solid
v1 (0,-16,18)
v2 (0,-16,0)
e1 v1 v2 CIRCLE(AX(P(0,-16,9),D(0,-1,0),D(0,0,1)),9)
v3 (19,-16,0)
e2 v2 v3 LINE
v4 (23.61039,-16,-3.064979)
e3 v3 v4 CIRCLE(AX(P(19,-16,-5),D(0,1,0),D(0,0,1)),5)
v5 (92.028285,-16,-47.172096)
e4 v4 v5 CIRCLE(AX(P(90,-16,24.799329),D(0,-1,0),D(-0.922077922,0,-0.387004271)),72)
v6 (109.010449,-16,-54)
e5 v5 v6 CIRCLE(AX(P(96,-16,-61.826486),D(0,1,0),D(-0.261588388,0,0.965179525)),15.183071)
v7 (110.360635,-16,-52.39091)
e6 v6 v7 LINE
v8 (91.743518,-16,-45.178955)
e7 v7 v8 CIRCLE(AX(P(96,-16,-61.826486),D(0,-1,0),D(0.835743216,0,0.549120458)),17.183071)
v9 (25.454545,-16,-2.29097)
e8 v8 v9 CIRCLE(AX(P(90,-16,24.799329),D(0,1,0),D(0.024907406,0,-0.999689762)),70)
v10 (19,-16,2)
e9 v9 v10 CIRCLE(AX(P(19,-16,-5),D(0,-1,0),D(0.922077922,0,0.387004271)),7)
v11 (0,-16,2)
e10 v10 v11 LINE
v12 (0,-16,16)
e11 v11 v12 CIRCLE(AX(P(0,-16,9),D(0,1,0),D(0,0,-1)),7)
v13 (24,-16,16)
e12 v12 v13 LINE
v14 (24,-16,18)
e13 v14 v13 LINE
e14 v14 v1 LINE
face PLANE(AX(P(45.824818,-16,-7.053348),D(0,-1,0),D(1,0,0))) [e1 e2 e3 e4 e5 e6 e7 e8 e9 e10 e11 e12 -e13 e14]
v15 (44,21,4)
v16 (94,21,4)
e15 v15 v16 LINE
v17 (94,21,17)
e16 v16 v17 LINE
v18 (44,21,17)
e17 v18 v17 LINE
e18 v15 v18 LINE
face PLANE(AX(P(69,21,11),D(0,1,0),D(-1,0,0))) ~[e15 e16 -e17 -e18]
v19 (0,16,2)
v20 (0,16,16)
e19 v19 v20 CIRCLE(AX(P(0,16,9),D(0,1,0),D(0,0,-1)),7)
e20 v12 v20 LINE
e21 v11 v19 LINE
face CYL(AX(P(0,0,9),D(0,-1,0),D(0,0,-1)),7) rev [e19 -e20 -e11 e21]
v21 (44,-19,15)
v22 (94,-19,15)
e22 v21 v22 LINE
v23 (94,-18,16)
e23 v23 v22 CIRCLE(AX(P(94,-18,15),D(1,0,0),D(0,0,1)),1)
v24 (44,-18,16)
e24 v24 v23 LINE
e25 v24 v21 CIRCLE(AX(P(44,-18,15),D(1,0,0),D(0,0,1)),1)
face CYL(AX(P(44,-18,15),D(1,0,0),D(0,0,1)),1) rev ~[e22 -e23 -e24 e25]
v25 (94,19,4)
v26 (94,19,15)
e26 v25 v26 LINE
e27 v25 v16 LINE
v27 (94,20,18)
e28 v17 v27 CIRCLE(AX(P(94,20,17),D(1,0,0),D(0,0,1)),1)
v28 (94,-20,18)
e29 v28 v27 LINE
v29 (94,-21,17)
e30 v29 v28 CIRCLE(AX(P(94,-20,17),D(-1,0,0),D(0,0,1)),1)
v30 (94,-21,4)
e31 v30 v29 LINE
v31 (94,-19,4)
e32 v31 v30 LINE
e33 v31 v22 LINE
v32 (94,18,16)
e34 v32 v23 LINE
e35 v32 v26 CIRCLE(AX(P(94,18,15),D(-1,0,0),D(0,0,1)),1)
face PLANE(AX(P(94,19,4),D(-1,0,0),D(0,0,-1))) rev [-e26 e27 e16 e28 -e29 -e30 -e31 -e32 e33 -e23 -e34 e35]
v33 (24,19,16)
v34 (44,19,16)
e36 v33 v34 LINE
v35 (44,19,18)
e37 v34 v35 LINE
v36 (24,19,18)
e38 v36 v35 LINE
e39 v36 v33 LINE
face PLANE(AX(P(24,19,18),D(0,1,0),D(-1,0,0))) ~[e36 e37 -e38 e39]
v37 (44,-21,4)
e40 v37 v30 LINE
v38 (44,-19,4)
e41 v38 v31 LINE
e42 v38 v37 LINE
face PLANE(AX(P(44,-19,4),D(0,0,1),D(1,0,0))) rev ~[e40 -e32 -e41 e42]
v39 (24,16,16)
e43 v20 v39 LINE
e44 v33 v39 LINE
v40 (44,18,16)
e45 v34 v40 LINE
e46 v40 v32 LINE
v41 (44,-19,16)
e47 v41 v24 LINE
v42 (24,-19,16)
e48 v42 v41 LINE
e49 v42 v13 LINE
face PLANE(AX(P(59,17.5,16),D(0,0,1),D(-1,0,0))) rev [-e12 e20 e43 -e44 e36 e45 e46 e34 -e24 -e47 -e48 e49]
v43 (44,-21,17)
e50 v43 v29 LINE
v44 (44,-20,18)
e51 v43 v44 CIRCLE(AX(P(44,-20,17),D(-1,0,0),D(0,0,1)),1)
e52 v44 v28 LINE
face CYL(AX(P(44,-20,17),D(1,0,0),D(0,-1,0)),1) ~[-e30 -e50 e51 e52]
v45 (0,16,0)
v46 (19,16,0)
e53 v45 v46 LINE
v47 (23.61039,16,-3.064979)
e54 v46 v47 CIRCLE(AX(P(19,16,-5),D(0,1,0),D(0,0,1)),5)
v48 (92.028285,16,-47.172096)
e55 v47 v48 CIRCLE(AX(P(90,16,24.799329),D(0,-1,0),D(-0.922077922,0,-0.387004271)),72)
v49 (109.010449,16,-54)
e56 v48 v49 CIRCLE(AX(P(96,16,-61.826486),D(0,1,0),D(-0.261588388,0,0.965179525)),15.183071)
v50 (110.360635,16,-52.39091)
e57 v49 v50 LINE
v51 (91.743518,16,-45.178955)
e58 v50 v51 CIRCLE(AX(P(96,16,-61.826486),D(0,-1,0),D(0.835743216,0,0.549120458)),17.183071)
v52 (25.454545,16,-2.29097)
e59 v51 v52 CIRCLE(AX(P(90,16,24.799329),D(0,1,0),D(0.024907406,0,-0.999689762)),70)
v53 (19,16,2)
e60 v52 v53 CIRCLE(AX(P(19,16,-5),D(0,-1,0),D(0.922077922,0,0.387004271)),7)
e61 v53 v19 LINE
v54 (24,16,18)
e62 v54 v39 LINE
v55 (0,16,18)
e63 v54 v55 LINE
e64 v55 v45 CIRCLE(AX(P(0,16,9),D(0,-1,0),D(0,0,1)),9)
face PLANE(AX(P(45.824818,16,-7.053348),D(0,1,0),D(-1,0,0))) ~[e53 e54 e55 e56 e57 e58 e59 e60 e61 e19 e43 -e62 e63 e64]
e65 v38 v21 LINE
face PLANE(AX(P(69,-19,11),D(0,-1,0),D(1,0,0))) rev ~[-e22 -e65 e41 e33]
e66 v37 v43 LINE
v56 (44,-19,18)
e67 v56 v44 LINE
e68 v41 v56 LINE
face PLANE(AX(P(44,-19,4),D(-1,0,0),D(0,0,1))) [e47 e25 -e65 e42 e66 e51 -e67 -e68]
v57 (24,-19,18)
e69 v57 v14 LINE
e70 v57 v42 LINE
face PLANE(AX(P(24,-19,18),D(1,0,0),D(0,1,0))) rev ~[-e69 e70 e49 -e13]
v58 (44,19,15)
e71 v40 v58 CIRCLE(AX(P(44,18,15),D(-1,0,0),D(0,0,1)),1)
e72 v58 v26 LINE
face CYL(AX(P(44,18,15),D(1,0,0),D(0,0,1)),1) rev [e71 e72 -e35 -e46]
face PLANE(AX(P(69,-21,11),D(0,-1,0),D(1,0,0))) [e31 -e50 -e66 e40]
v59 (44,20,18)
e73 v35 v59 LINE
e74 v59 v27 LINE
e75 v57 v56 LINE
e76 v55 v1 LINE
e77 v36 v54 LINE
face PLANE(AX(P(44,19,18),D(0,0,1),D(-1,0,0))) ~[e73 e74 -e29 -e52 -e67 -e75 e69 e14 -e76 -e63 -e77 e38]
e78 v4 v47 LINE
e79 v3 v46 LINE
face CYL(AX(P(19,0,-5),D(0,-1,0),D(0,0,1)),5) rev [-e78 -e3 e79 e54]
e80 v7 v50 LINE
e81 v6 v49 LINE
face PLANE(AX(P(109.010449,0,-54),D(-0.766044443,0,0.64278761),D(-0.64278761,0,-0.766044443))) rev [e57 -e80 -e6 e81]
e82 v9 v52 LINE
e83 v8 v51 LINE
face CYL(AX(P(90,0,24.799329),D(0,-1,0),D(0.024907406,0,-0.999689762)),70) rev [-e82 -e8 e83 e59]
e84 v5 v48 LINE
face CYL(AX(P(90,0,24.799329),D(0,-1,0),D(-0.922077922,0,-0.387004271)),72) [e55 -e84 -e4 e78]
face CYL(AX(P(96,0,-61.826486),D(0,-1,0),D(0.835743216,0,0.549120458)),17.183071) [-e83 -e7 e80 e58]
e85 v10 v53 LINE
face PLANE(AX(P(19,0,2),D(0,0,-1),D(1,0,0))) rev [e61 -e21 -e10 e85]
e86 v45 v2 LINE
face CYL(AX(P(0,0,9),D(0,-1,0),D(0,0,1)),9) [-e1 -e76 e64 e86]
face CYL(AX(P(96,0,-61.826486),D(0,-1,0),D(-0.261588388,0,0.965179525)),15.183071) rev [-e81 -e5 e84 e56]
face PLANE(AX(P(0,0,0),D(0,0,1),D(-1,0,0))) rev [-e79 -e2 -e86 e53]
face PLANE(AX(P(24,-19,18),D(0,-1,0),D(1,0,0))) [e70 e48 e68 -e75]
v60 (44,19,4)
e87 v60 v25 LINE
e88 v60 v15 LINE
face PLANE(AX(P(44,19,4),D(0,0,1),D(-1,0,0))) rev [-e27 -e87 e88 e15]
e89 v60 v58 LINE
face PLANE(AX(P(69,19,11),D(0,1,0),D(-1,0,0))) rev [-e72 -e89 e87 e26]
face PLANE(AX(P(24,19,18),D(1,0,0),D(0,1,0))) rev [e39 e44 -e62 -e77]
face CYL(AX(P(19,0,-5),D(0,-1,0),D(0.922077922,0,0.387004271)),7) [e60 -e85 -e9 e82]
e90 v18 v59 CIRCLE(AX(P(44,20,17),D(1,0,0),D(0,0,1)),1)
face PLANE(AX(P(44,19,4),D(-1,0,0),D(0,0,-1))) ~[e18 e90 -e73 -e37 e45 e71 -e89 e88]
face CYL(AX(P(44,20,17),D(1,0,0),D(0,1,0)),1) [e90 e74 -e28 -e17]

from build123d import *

# Parameters (mm, degrees)
F1_DEPTH = 16
F2_W     = 70
F2_H     = 3
F3_DEPTH = 2
F4_W     = 50
F4_H     = 14
F5_DEPTH = 2
F6_R     = 1


with BuildPart() as f1:
    # F0 (on Front) → F1 (new body)
    with BuildSketch(Plane.XZ):
        with BuildLine():
            Line((94, 18), (0, 18))
            ThreePointArc((0, 18), (-9, 9), (0, 0))
            Line((0, 0), (19, 0))
            ThreePointArc((19, 0), (21.7681124643, -0.8361612201), (23.6103896104, -3.064978646))
            ThreePointArc((23.6103896104, -3.064978646), (50.9877645087, -35.7155080232), (92.0282848079, -47.1720964556))
            ThreePointArc((92.0282848079, -47.1720964556), (101.6638981451, -47.7394028226), (109.0104486201, -54))
            Line((109.0104486201, -54), (110.3606353849, -52.3909100723))
            ThreePointArc((110.3606353849, -52.3909100723), (102.2069764649, -45.8036465806), (91.7435184361, -45.1789545189))
            ThreePointArc((91.7435184361, -45.1789545189), (51.9754606004, -33.9725556125), (25.4545454545, -2.2909701044))
            ThreePointArc((25.4545454545, -2.2909701044), (22.87535745, 0.8293742919), (19, 2))
            Line((19, 2), (0, 2))
            ThreePointArc((0, 2), (-7, 9), (0, 16))
            Line((0, 16), (94, 16))
            Line((94, 16), (94, 18))
        make_face()
    extrude(amount=F1_DEPTH)

    # F2 (on face) → F3 (join)
    with BuildSketch(Plane.XY.offset(18)):
        with Locations((59, -17.5)):
            Rectangle(F2_W, F2_H)
    extrude(amount=-F3_DEPTH)

    # F4 (on face) → F5 (join)
    with BuildSketch(Plane.XZ.offset(19)):
        with Locations((69, 11)):
            Rectangle(F4_W, F4_H)
    extrude(amount=F5_DEPTH)

    # F6
    f6_edges = [f1.edges().sort_by_distance(p)[0] for p in [
        (69, -21, 18),
        (69, -19, 16),
    ]]
    fillet(f6_edges, radius=F6_R)

    # F7: F1 across plane


with BuildPart() as f1_1:
    add(f1.part)
    add(f1.part.mirror(Plane.XZ))


solid = f1_1.part
